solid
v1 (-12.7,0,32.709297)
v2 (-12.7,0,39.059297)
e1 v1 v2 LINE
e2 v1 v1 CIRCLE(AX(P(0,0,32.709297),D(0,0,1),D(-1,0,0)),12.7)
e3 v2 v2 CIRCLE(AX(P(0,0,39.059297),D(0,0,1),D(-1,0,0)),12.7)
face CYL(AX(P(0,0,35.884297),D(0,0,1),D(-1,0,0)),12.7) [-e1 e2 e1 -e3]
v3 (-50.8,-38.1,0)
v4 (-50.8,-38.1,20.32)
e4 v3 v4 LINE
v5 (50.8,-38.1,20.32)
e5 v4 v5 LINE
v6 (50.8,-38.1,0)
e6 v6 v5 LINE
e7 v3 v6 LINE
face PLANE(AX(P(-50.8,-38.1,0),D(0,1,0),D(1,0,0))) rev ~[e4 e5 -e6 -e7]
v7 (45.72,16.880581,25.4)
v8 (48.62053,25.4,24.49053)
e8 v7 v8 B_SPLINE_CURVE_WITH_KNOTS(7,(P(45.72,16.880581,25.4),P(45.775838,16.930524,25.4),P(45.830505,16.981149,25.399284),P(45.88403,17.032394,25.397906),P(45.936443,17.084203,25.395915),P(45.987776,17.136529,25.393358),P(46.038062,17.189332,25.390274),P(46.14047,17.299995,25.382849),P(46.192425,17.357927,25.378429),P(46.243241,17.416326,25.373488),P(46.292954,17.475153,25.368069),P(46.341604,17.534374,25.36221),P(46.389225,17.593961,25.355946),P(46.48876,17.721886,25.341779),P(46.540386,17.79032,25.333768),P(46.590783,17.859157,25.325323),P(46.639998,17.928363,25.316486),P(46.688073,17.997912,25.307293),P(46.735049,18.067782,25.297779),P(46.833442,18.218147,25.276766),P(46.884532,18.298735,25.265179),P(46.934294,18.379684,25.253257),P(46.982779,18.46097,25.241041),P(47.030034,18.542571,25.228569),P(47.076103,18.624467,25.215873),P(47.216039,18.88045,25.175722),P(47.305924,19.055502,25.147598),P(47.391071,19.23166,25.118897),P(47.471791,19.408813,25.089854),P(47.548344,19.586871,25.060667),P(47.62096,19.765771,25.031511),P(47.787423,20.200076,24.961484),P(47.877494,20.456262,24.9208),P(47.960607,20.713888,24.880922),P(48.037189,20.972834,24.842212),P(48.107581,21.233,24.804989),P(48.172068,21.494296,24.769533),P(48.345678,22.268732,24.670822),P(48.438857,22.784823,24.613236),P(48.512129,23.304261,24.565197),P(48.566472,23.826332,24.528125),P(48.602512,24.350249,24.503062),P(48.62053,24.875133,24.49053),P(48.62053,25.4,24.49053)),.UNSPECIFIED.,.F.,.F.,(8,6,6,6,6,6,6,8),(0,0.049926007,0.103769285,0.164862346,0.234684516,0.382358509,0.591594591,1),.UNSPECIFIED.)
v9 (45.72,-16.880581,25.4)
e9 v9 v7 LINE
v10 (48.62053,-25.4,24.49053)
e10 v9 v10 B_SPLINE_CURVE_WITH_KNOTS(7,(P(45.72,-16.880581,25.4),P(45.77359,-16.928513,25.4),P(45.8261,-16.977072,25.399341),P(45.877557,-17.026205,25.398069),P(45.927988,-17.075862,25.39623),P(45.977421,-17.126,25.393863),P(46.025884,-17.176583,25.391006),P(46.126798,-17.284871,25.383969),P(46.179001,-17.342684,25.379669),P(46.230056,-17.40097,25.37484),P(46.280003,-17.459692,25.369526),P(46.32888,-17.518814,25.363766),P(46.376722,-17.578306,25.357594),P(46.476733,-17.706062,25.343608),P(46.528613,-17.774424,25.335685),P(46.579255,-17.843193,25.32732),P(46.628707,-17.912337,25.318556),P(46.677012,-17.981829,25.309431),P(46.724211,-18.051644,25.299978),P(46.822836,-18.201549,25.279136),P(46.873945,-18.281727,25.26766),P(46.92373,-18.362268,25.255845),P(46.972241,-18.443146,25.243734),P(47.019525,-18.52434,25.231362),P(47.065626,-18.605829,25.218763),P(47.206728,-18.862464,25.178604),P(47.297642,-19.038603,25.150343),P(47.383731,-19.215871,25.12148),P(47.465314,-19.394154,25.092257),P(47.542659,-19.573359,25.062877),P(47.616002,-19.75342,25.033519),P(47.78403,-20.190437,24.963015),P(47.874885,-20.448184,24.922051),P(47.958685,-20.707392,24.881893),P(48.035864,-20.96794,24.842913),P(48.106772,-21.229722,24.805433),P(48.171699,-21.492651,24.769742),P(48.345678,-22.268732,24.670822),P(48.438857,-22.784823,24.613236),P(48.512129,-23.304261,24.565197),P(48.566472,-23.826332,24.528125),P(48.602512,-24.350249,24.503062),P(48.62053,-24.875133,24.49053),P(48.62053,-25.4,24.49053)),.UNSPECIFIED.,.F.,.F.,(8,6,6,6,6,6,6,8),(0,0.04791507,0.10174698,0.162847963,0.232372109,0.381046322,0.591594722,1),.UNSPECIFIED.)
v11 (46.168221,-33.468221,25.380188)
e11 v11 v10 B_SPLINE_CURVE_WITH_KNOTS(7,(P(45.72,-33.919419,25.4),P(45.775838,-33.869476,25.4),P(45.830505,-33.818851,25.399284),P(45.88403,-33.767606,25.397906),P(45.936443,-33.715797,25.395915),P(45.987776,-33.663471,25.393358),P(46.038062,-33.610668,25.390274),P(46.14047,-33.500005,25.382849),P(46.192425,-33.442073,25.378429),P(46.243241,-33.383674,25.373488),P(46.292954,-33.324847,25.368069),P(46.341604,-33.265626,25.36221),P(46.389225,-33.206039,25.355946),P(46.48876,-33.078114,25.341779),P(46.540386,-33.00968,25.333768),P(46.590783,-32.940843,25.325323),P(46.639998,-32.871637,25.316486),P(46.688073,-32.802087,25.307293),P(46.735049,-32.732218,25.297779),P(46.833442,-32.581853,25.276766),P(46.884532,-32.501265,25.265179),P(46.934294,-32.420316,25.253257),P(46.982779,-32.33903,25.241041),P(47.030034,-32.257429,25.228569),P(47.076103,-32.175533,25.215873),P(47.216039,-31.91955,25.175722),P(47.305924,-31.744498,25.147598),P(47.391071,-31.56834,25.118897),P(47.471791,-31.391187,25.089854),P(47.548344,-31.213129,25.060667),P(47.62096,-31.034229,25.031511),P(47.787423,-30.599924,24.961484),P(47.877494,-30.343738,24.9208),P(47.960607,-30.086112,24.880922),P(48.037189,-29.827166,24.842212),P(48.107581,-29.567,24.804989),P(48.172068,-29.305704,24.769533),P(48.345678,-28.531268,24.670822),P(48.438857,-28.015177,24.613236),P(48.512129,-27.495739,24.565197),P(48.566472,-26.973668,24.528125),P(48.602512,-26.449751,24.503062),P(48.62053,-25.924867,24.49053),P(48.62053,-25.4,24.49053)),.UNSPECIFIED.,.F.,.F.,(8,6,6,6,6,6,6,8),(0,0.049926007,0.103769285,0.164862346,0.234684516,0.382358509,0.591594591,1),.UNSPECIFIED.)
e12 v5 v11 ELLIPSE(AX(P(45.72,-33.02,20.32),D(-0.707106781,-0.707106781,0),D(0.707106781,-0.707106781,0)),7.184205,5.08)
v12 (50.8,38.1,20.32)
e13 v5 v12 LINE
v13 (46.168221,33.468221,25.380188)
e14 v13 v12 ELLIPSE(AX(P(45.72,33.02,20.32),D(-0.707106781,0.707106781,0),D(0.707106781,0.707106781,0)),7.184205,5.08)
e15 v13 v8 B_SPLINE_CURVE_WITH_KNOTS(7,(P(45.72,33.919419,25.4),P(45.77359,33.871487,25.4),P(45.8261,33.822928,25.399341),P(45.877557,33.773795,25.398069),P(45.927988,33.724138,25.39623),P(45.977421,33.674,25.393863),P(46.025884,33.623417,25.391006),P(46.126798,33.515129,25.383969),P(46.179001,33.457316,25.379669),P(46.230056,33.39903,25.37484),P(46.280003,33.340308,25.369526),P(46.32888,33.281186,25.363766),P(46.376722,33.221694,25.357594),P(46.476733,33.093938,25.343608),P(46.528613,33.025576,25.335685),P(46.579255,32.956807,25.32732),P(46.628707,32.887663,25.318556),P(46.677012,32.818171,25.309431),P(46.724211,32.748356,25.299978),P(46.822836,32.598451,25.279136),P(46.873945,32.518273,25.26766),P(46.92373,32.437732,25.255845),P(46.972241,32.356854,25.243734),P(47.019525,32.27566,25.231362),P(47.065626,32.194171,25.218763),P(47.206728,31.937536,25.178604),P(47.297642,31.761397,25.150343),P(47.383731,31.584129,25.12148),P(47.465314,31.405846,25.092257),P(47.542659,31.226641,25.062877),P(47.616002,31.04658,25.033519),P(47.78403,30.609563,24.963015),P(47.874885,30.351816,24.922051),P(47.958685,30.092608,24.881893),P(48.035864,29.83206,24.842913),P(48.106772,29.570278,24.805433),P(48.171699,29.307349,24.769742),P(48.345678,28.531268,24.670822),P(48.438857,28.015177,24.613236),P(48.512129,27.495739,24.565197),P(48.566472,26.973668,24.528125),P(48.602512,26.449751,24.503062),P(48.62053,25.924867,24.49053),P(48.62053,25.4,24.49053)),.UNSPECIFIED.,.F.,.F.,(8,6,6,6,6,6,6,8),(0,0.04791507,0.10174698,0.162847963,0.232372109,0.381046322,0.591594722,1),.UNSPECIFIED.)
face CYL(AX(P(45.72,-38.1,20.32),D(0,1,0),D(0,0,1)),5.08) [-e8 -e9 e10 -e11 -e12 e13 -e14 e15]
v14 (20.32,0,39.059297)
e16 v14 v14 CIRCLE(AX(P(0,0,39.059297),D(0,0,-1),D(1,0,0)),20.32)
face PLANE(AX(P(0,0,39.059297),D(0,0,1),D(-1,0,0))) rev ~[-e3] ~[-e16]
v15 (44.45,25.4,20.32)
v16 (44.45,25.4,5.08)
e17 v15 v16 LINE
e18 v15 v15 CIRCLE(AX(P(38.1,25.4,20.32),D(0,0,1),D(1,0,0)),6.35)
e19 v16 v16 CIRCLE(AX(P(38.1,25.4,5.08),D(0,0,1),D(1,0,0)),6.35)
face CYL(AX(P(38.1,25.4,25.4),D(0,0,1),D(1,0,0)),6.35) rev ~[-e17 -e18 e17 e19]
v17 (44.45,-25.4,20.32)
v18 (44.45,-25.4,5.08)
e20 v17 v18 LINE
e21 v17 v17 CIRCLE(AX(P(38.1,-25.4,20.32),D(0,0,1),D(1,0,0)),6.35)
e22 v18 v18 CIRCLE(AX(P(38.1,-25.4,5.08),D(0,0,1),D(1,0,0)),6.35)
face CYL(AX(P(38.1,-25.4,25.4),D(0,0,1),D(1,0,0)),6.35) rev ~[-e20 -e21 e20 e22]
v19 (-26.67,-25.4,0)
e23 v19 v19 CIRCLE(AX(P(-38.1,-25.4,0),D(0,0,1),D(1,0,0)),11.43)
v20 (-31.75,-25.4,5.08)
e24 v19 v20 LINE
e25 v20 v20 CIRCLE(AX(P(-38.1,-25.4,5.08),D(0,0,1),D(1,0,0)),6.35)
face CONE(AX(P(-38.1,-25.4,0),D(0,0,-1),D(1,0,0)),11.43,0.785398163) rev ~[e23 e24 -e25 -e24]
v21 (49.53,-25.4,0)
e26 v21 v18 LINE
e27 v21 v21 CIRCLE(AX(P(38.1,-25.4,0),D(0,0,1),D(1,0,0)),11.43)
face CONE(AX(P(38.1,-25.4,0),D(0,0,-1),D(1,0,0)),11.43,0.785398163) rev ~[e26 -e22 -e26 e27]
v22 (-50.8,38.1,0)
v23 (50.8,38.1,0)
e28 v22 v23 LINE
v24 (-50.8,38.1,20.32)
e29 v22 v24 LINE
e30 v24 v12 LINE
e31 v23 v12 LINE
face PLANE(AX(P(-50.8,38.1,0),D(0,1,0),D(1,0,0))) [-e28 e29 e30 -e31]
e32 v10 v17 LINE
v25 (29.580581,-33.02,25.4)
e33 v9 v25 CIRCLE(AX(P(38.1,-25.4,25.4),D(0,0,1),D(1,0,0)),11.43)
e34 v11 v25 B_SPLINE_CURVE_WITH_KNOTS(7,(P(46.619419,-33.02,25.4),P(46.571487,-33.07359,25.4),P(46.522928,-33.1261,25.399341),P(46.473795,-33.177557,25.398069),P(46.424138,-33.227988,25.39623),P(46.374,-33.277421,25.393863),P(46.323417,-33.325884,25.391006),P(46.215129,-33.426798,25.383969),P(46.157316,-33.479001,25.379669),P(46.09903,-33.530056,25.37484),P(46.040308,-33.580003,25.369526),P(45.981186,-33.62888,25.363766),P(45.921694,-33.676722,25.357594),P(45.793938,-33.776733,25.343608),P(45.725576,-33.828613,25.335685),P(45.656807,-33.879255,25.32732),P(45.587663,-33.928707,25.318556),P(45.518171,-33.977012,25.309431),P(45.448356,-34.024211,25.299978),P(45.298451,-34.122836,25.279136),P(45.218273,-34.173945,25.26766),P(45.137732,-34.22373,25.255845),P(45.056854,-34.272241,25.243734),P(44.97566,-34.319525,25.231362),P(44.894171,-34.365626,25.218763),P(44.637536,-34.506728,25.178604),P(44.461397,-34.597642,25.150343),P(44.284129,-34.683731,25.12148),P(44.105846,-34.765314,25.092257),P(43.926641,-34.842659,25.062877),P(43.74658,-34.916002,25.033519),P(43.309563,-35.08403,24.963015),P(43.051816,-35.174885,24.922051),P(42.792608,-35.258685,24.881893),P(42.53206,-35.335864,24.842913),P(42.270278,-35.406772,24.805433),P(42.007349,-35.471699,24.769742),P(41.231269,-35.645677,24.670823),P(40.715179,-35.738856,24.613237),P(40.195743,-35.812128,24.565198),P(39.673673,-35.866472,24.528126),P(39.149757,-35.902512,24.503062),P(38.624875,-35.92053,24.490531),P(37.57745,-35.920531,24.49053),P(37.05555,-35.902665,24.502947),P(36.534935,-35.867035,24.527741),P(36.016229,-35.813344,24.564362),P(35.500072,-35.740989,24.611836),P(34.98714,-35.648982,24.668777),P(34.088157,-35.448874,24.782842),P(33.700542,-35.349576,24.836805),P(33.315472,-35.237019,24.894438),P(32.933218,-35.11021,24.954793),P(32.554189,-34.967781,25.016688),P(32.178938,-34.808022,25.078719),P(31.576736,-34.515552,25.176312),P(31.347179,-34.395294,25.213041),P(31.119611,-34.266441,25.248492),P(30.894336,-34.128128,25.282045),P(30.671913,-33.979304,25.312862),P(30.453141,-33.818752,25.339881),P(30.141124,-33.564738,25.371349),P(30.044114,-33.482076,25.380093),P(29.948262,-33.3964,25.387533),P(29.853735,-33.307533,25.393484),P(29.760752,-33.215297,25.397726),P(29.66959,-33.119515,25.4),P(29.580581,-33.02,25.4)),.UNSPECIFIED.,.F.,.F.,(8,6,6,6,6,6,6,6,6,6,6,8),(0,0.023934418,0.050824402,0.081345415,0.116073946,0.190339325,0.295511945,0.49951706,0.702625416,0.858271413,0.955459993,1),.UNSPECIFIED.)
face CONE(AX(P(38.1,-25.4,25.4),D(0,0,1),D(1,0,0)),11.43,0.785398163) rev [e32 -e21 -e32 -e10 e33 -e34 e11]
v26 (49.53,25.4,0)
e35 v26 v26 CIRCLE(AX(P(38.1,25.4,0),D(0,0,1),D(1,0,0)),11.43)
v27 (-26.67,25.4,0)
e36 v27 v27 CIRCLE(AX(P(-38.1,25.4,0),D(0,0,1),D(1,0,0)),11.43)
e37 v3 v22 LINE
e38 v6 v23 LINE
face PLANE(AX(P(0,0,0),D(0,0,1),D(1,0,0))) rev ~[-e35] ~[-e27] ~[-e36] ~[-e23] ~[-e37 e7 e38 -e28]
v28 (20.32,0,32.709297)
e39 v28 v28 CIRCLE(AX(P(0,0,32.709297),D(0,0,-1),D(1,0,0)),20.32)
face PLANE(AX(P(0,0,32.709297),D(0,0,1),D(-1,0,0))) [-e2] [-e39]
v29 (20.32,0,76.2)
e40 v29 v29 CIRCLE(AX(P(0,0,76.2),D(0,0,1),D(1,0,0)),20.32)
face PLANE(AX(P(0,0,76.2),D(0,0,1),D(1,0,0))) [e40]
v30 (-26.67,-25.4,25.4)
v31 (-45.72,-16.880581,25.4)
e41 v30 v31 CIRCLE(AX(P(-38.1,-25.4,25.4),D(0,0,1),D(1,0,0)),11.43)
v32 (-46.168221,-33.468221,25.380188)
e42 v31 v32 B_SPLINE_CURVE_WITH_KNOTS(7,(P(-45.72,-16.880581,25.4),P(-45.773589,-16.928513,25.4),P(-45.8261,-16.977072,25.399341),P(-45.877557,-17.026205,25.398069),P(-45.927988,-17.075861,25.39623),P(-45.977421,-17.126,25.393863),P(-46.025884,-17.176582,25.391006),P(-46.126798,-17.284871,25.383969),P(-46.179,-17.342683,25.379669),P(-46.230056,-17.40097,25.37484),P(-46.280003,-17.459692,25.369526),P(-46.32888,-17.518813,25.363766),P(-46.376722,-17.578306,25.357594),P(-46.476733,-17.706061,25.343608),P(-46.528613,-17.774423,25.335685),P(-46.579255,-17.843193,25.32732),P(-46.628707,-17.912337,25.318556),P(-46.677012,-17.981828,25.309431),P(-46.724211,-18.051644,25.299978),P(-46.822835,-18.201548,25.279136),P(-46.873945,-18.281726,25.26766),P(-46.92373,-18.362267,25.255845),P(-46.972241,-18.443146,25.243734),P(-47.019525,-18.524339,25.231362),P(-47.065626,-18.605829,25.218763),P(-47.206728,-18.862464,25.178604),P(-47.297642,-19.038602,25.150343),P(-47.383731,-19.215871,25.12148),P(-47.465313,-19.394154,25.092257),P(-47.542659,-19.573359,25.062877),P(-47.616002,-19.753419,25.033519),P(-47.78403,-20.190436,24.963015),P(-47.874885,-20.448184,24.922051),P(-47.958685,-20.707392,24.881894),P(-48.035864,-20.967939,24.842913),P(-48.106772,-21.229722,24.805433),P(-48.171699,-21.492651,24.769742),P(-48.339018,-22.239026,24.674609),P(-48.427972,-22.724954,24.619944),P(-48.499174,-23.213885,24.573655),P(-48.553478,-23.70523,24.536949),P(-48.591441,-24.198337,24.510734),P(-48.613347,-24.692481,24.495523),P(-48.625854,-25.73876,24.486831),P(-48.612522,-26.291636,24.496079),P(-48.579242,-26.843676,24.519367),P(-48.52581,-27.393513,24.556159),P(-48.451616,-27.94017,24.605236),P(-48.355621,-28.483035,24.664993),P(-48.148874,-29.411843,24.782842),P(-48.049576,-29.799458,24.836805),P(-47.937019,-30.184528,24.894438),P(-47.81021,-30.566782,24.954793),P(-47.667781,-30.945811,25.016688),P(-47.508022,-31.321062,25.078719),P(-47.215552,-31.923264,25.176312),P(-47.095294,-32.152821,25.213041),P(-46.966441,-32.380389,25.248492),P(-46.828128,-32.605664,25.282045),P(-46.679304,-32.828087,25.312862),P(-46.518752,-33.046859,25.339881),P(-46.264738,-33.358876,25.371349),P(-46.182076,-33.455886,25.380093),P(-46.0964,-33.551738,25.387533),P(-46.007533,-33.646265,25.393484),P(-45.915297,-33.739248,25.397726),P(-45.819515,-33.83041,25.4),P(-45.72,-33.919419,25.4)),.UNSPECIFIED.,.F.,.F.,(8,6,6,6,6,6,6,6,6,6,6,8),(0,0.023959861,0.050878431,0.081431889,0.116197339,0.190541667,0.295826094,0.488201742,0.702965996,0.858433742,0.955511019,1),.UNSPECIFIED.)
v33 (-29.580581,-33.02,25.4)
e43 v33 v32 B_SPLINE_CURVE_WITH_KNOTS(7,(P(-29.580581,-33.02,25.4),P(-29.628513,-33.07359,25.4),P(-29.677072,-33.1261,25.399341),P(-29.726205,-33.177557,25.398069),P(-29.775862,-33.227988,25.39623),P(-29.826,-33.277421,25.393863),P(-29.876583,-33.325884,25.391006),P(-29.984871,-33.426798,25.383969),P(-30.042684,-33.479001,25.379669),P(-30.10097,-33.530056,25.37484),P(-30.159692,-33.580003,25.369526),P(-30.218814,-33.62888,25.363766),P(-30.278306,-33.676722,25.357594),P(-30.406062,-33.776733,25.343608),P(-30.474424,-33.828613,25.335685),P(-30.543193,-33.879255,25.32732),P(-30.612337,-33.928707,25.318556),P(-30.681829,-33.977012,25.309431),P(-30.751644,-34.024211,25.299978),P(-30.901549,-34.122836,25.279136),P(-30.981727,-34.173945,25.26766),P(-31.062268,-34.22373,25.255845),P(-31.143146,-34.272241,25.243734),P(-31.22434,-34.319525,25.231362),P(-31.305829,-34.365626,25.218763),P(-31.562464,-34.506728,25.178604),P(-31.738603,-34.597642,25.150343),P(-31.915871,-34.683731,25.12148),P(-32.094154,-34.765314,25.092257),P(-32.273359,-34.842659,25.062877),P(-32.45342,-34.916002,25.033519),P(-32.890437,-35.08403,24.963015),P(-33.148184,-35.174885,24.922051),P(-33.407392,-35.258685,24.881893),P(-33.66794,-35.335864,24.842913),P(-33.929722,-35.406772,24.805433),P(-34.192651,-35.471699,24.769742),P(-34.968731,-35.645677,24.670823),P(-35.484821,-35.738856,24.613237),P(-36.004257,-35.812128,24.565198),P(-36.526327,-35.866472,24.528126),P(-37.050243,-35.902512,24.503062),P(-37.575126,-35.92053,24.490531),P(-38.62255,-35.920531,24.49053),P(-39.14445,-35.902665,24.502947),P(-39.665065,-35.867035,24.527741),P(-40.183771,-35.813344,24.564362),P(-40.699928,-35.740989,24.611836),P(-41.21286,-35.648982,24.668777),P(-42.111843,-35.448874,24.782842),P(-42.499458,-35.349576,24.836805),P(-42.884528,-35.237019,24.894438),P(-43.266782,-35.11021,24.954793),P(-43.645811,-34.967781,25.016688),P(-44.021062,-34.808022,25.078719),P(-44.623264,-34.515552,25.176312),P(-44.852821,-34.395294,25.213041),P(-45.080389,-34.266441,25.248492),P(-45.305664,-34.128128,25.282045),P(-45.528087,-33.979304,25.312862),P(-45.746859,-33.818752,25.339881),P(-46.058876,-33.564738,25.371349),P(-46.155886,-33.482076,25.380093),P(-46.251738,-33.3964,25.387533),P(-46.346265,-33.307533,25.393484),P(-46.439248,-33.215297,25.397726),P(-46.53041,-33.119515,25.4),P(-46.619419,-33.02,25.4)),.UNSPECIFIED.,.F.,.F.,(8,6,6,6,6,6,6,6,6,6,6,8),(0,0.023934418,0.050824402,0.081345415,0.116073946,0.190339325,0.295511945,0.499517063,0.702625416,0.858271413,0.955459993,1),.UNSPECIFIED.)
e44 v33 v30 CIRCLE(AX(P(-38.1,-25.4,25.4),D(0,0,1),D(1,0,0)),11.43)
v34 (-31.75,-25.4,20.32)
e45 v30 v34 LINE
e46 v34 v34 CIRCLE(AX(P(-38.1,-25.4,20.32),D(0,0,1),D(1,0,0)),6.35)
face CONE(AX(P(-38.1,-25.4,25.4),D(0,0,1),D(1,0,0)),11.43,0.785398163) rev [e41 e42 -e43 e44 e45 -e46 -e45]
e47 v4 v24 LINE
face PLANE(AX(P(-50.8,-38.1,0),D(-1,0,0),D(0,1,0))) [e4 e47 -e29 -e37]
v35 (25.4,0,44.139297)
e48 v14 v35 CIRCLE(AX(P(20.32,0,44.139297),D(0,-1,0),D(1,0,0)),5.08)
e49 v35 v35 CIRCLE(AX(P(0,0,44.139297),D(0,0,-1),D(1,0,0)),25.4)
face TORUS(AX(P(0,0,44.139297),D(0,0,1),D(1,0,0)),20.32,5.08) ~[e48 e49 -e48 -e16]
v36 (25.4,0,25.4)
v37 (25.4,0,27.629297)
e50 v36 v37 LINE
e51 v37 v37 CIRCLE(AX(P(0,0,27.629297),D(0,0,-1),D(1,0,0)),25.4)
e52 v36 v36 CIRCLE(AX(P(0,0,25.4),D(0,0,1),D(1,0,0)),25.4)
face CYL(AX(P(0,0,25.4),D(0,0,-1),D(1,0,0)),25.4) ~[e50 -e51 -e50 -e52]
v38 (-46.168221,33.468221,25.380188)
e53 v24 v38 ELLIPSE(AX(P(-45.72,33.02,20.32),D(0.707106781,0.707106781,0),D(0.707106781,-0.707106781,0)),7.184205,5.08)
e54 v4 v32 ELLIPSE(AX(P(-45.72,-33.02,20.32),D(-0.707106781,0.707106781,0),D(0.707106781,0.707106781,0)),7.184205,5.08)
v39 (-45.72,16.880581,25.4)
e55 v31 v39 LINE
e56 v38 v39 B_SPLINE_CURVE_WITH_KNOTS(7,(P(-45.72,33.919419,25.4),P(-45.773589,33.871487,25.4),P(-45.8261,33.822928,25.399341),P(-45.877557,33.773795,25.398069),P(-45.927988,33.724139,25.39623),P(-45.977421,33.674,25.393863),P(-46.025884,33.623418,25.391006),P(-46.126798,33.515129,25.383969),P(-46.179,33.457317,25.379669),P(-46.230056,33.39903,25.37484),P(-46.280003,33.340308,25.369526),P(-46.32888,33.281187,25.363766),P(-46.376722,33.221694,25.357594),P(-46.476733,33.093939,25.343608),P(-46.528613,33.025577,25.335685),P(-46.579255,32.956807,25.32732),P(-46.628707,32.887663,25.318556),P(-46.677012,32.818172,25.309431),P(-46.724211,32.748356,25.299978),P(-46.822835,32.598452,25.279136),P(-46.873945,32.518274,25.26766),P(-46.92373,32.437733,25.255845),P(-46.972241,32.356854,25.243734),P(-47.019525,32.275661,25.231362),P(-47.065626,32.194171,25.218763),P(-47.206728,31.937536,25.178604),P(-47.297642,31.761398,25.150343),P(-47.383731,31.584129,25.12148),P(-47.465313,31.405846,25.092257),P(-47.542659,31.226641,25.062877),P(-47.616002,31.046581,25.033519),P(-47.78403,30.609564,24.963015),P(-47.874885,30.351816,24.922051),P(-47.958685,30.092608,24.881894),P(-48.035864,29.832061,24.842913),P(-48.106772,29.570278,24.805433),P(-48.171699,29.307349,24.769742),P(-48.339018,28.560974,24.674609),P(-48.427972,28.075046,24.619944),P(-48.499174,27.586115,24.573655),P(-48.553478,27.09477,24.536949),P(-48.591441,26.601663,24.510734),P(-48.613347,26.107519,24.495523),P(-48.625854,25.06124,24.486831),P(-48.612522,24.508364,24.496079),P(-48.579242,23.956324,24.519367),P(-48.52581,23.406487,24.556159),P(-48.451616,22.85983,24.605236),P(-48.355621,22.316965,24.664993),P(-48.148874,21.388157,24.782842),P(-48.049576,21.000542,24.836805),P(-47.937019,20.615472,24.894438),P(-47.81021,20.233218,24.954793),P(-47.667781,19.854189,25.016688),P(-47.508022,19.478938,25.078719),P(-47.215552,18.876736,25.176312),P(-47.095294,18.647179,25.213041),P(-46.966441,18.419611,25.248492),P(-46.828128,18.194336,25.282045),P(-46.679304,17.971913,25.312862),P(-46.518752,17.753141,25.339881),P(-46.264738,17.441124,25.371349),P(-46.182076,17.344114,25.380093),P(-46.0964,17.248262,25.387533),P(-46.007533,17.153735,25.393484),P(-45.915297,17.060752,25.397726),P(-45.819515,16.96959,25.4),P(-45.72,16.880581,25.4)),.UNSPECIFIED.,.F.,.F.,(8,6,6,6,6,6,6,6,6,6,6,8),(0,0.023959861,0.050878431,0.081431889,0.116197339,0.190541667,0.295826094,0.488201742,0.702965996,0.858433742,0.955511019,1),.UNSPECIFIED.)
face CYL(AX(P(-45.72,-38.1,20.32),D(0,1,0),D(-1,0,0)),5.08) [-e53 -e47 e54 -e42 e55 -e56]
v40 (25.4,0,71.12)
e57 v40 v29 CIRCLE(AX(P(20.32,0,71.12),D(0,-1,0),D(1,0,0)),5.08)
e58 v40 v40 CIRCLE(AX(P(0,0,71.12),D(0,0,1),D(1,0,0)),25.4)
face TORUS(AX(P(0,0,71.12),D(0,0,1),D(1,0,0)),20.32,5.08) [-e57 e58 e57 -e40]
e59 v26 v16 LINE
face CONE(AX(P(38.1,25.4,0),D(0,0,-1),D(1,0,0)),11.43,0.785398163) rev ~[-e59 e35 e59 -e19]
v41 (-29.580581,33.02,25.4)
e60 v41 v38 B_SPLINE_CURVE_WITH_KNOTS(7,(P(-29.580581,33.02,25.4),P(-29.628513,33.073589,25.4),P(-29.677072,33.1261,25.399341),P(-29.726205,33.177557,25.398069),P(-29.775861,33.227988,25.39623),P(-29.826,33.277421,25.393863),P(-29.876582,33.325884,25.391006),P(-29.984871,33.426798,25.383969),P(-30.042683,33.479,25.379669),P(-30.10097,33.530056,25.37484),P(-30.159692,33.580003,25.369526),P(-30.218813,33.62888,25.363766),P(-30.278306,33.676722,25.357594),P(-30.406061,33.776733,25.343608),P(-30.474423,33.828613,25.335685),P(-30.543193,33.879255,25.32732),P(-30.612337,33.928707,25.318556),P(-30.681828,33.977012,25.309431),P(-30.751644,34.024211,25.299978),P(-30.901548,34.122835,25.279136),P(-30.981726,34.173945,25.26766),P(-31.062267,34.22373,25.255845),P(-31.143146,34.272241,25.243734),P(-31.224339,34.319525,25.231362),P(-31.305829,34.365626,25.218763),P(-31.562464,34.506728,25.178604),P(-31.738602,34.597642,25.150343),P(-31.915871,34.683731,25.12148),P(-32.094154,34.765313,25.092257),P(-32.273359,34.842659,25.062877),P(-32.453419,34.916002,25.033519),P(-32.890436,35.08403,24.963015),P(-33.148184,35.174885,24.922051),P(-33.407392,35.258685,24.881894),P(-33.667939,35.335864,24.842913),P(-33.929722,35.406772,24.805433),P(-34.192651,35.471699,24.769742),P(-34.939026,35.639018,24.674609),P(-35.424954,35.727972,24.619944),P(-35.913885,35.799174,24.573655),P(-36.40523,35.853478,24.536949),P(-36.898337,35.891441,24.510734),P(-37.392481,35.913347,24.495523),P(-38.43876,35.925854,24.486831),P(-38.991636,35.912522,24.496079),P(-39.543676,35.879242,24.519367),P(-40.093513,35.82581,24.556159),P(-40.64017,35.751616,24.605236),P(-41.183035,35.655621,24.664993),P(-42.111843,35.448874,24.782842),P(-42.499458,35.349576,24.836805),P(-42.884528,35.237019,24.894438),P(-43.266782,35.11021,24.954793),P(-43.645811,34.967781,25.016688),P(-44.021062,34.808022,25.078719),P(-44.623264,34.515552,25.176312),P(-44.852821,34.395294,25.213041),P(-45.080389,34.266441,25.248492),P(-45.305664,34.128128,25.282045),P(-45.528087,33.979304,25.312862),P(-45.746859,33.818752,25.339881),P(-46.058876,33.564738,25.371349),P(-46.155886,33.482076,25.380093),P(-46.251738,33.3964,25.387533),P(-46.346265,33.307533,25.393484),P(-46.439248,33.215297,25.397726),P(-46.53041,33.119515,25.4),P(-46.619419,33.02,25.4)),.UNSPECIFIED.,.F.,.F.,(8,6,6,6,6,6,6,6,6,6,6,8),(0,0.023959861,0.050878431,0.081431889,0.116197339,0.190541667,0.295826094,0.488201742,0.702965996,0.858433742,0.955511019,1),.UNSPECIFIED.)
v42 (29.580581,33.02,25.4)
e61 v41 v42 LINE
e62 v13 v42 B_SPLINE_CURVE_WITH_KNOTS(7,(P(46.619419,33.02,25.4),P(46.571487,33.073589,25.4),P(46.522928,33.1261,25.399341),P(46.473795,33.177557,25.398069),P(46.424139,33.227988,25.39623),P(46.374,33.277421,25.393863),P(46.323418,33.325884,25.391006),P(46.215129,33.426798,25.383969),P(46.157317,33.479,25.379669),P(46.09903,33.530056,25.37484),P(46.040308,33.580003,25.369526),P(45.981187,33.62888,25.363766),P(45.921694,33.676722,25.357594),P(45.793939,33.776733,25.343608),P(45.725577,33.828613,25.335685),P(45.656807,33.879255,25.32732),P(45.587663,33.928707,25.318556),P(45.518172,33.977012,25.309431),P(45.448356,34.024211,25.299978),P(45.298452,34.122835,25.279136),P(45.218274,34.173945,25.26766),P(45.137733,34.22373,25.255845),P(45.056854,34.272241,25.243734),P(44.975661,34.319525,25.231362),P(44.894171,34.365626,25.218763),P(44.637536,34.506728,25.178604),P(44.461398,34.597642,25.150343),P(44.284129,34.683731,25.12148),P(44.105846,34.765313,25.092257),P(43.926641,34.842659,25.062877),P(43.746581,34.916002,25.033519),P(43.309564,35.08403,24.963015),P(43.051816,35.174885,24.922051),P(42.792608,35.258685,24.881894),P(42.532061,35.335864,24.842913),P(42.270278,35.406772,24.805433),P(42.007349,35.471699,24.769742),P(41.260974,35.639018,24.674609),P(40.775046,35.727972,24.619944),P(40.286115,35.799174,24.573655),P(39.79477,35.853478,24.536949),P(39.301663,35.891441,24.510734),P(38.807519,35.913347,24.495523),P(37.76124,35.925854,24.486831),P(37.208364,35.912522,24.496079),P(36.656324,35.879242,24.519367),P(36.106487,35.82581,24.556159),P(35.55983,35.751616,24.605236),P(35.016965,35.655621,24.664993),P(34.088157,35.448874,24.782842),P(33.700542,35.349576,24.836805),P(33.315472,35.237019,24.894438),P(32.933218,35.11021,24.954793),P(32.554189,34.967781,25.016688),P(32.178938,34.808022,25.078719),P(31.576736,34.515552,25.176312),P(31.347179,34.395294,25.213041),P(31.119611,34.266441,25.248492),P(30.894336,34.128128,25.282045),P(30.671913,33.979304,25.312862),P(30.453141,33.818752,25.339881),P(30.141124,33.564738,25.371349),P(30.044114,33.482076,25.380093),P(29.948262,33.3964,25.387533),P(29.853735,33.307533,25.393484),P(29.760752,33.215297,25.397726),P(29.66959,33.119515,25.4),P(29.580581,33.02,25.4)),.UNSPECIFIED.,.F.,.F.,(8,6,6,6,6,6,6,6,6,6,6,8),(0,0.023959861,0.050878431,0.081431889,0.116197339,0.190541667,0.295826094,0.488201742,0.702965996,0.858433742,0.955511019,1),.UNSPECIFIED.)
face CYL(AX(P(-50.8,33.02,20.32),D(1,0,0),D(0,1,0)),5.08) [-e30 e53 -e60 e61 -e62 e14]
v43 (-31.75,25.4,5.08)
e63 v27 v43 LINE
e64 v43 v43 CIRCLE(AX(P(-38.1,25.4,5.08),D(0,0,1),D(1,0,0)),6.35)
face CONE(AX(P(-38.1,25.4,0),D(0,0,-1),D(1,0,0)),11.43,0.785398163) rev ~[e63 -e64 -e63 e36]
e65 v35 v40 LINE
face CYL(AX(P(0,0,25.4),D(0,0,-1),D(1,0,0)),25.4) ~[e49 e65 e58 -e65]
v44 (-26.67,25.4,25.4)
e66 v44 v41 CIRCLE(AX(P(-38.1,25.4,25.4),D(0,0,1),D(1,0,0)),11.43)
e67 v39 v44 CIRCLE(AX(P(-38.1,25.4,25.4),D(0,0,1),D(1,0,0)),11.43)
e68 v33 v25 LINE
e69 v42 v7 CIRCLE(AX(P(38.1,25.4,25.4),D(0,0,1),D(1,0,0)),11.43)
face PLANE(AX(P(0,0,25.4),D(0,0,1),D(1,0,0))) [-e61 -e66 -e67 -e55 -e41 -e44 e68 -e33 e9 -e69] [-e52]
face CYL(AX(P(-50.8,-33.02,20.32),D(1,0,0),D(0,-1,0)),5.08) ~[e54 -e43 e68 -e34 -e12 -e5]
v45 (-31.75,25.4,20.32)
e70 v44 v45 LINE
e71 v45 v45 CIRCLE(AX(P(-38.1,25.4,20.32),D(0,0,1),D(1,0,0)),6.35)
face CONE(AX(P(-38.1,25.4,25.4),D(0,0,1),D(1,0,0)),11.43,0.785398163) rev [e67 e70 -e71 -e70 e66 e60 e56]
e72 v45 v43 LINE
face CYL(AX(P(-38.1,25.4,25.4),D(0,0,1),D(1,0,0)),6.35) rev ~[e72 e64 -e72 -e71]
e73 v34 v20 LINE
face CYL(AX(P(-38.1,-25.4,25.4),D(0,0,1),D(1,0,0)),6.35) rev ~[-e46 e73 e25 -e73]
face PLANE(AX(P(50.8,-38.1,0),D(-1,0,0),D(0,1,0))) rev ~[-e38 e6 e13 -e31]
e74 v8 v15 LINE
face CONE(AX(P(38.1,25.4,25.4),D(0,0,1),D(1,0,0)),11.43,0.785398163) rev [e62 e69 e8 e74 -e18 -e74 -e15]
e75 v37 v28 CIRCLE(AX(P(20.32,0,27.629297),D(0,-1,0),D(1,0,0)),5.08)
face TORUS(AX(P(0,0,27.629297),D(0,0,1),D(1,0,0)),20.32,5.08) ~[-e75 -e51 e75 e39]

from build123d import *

# Parameters (mm, degrees)
F0_W     = 101.6
F0_H     = 76.2
F1_DEPTH = 25.4
F2_R     = 6.35
F3_DEPTH = 25.4
F4_R     = 25.4
F5_DEPTH = 50.8
F6_W     = 61.2722363651
F6_H     = 6.35
F8_R     = 5.08


# Not quite as in the source:
# - a fillet or chamfer that OpenCascade refuses, or shapes differently, is made with other operations: its cross-section is extruded or revolved along the edge and cut away or added


with BuildPart() as f1:
    # F0 (on Top) → F1 (new body)
    with BuildSketch(Plane.XY):
        Rectangle(F0_W, F0_H)
    extrude(amount=F1_DEPTH)

    # F2 (on face) → F3 (cut, through all)
    with BuildSketch(Plane.XY.offset(25.4)):
        with Locations((-38.1, 25.4)):
            Circle(F2_R)
        with Locations((38.1, 25.4)):
            Circle(F2_R)
        with Locations((38.1, -25.4)):
            Circle(F2_R)
        with Locations((-38.1, -25.4)):
            Circle(F2_R)
    extrude(amount=-F3_DEPTH, mode=Mode.SUBTRACT)

    # F4 (on face) → F5 (join)
    with BuildSketch(Plane.XY.offset(25.4)):
        Circle(F4_R)
    extrude(amount=F5_DEPTH)

    # F6 (on Front) → F7 (revolve, cut)
    with BuildSketch(Plane.XZ):
        with Locations((-43.3361181825, 35.8842967927)):
            Rectangle(F6_W, F6_H)
    revolve(axis=Axis((0, 0, 28.4035503864), (0, 0, 1)), mode=Mode.SUBTRACT)

    # F8
    f8_edges = [f1.edges().sort_by_distance(p)[0] for p in [
        (0, -38.1, 25.4),
        (-25.4, 0, 32.709297),
        (-25.4, 0, 39.059297),
        (-25.4, 0, 76.2),
        (50.8, 0, 25.4),
        (0, 38.1, 25.4),
        (-50.8, 0, 25.4),
    ]]
    fillet(f8_edges, radius=F8_R)

    # F9: chamfer of 5.08 on 12 edges, made by hand

    # F9_s1 → F9_t2 (revolve, cut)
    with BuildSketch(Plane.XZ.offset(25.4)):
        Polygon((-26.67, 25.4), (-31.75, 20.32), (-31.75, 25.4), align=None)
    revolve(axis=Axis((-38.1, -25.4, 25.4), (0, 0, 1)), mode=Mode.SUBTRACT)

    # F9_s3 → F9_t4 (revolve, cut)
    with BuildSketch(Plane.XZ.offset(25.4)):
        Polygon((-26.67, 0), (-31.75, 5.08), (-31.75, 0), align=None)
    revolve(axis=Axis((-38.1, -25.4, 0), (0, 0, 1)), mode=Mode.SUBTRACT)

    # F9_s5 → F9_t6 (revolve, cut)
    with BuildSketch(Plane.XZ.offset(-25.4)):
        Polygon((-26.67, 25.4), (-31.75, 20.32), (-31.75, 25.4), align=None)
    revolve(axis=Axis((-38.1, 25.4, 25.4), (0, 0, 1)), mode=Mode.SUBTRACT)

    # F9_s7 → F9_t8 (revolve, cut)
    with BuildSketch(Plane.XZ.offset(-25.4)):
        Polygon((-26.67, 0), (-31.75, 5.08), (-31.75, 0), align=None)
    revolve(axis=Axis((-38.1, 25.4, 0), (0, 0, 1)), mode=Mode.SUBTRACT)

    # F9_s9 → F9_t10 (revolve, cut)
    with BuildSketch(Plane.XZ.offset(-25.4)):
        Polygon((49.53, 25.4), (44.45, 20.32), (44.45, 25.4), align=None)
    revolve(axis=Axis((38.1, 25.4, 25.4), (0, 0, 1)), mode=Mode.SUBTRACT)

    # F9_s11 → F9_t12 (revolve, cut)
    with BuildSketch(Plane.XZ.offset(-25.4)):
        Polygon((49.53, 0), (44.45, 5.08), (44.45, 0), align=None)
    revolve(axis=Axis((38.1, 25.4, 0), (0, 0, 1)), mode=Mode.SUBTRACT)

    # F9_s13 → F9_t14 (revolve, cut)
    with BuildSketch(Plane.XZ.offset(25.4)):
        Polygon((49.53, 25.4), (44.45, 20.32), (44.45, 25.4), align=None)
    revolve(axis=Axis((38.1, -25.4, 25.4), (0, 0, 1)), mode=Mode.SUBTRACT)

    # F9_s15 → F9_t16 (revolve, cut)
    with BuildSketch(Plane.XZ.offset(25.4)):
        Polygon((49.53, 0), (44.45, 5.08), (44.45, 0), align=None)
    revolve(axis=Axis((38.1, -25.4, 0), (0, 0, 1)), mode=Mode.SUBTRACT)


solid = f1.part
